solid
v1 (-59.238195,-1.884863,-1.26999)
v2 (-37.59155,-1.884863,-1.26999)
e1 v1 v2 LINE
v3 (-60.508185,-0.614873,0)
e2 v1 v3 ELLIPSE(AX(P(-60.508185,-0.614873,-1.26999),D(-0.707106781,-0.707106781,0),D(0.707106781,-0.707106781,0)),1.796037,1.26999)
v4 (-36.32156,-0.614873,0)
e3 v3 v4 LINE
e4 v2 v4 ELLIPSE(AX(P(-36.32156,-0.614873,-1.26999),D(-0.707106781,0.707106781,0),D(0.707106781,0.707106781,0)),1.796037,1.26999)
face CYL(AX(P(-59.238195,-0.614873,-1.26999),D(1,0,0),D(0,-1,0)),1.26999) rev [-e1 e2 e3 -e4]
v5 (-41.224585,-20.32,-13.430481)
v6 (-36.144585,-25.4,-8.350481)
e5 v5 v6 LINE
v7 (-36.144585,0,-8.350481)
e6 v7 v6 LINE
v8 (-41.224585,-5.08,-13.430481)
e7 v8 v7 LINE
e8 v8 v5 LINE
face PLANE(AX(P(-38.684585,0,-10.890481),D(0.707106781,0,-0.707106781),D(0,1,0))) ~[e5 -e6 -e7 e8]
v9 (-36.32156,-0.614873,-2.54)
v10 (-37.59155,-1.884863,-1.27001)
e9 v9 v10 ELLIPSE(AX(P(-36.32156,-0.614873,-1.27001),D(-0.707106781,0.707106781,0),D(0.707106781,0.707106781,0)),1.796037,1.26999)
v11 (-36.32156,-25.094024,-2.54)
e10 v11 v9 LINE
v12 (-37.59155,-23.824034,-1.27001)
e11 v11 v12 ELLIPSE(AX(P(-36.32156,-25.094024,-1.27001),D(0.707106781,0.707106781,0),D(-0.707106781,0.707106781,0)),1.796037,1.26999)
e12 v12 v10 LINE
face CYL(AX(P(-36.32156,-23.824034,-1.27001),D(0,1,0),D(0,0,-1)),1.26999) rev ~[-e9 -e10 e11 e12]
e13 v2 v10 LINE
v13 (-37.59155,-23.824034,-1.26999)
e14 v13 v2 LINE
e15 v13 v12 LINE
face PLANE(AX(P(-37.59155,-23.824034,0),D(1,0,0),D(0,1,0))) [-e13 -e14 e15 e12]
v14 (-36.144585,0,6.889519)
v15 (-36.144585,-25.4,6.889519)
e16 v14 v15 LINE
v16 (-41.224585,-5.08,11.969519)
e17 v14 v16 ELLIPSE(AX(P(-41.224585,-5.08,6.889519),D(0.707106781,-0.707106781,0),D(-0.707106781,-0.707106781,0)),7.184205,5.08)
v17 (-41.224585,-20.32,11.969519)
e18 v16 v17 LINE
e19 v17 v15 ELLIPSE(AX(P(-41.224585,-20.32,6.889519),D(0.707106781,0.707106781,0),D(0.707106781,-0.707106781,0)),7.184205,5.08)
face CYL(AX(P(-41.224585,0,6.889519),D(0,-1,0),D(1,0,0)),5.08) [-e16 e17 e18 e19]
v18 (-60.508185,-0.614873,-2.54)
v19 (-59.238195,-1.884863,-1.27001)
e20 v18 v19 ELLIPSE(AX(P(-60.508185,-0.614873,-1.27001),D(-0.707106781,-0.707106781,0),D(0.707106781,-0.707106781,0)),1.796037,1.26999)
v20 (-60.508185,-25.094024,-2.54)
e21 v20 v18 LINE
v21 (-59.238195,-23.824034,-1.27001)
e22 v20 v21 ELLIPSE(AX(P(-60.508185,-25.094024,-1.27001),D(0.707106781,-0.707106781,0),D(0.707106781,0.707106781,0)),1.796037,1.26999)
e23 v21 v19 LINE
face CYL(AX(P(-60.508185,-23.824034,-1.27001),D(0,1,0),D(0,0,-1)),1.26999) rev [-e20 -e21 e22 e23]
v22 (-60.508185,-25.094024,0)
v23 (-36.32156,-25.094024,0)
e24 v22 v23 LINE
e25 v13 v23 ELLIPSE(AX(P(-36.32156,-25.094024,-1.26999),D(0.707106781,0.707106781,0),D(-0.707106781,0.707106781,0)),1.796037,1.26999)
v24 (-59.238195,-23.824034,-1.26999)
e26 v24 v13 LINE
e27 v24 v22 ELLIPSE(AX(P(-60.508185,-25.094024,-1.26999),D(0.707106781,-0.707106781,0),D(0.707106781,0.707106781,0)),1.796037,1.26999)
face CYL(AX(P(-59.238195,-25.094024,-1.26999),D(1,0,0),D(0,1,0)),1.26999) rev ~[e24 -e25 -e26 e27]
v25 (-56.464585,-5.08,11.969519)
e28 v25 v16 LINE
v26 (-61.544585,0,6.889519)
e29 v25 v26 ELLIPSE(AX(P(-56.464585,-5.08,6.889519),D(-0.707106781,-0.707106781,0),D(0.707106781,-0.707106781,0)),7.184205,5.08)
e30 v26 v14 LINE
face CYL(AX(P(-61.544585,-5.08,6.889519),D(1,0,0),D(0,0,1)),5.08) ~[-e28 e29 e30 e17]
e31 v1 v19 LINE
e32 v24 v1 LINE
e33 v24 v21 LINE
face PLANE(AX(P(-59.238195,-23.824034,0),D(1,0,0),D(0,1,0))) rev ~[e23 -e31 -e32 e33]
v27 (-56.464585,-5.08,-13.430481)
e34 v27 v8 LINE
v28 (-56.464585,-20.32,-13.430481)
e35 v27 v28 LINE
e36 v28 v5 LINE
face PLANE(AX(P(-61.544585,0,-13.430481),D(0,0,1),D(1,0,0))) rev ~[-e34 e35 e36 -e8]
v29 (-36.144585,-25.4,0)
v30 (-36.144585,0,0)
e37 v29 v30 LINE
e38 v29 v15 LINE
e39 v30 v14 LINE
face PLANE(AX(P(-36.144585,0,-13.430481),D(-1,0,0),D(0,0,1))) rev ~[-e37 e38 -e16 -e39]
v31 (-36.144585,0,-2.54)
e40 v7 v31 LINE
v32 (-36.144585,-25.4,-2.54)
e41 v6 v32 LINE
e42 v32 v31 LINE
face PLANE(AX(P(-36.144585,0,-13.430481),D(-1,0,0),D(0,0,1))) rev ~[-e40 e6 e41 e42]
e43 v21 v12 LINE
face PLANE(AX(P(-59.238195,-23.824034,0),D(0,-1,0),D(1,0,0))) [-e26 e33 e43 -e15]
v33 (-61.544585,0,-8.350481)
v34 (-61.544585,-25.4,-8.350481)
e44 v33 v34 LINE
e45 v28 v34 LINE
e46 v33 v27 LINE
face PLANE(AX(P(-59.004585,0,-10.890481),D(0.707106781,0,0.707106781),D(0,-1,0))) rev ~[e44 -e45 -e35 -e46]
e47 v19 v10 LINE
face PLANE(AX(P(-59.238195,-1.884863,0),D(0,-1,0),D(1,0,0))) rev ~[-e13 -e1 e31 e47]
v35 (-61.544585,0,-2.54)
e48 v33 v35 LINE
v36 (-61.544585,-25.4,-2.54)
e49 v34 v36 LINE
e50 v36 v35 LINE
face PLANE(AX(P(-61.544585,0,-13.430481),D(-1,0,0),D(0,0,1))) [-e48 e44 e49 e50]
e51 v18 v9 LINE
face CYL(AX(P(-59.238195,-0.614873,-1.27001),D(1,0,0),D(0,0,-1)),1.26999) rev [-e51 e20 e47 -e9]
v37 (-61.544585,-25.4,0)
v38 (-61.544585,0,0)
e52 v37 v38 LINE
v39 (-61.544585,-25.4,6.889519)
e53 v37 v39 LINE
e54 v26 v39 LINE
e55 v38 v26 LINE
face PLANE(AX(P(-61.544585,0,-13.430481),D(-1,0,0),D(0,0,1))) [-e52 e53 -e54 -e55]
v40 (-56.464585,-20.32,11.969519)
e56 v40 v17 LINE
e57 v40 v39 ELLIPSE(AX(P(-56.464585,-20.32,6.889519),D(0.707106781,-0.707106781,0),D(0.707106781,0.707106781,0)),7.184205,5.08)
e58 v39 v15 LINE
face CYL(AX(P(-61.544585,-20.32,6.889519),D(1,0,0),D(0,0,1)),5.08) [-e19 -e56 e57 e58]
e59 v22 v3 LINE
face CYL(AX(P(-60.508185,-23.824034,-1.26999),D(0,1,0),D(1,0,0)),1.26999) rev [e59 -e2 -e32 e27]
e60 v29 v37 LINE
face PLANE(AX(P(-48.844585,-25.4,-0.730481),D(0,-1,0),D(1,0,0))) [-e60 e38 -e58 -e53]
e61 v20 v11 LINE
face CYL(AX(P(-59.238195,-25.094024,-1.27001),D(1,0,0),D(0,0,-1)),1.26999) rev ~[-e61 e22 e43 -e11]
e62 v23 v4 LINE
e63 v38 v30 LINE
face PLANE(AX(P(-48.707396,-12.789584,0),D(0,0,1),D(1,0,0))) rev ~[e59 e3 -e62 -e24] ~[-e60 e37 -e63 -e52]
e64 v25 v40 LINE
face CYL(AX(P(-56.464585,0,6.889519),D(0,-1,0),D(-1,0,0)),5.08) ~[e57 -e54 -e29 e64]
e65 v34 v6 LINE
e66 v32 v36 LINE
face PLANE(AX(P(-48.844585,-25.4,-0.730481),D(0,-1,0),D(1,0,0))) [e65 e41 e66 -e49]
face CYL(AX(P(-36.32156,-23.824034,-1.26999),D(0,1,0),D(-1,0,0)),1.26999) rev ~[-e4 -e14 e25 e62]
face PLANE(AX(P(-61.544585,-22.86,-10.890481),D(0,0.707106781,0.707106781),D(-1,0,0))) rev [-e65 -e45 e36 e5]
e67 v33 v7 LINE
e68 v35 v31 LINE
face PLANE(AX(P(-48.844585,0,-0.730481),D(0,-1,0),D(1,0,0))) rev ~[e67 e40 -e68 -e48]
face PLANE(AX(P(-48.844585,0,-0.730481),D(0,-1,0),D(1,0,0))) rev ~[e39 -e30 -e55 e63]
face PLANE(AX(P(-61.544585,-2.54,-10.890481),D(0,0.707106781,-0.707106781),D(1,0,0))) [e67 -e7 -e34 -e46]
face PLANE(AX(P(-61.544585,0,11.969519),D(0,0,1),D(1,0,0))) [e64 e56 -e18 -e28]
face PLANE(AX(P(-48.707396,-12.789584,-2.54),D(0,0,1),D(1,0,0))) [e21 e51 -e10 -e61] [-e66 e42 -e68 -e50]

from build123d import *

# Parameters (mm, degrees)
F0_W     = 25.4
F0_H     = 25.4
F1_DEPTH = 25.4
F2_R     = 5.08
F3_SIZE  = 5.08
F4_W     = 25.741957128
F4_H     = 25.5791675299
F4_W_2   = 21.6466449201
F4_H_2   = 21.9391710125
F5_DEPTH = 2.54
F6_R     = 1.26999


# Not quite as in the source:
# - a fillet or chamfer is up to 0.001 mm smaller than in the source, because OpenCascade refuses the exact size


with BuildPart() as f1:
    # F0 (on Front) → F1 (new body)
    with BuildSketch(Plane.XZ):
        with Locations((-48.8445848724, -0.7304809988)):
            Rectangle(F0_W, F0_H)
    extrude(amount=F1_DEPTH)

    # F2
    f2_edges = [f1.edges().sort_by_distance(p)[0] for p in [
        (-48.844585, -25.4, 11.969519),
        (-36.144585, -12.7, 11.969519),
        (-48.844585, 0, 11.969519),
        (-61.544585, -12.7, 11.969519),
    ]]
    fillet(f2_edges, radius=F2_R)

    # F3
    f3_edges = [f1.edges().sort_by_distance(p)[0] for p in [
        (-48.844585, -25.4, -13.430481),
        (-36.144585, -12.7, -13.430481),
        (-61.544585, -12.7, -13.430481),
        (-48.844585, 0, -13.430481),
    ]]
    chamfer(f3_edges, length=F3_SIZE)

    # F4 (on Top) → F5 (cut)
    with BuildSketch(Plane.XY):
        with Locations((-48.707395792, -12.789583765)):
            Rectangle(F4_W, F4_H)
        with Locations((-48.4148729593, -12.8544487525)):
            Rectangle(F4_W_2, F4_H_2, mode=Mode.SUBTRACT)
    extrude(amount=-F5_DEPTH, mode=Mode.SUBTRACT)

    # F6 (radius 1.27 in the source; OpenCascade refuses exactly that, so slightly less here)
    f6_edges = [f1.edges().sort_by_distance(p)[0] for p in [
        (-48.414873, -1.884863, -2.54),
        (-37.59155, -12.854449, -2.54),
        (-48.414873, -1.884863, 0),
        (-37.59155, -12.854449, 0),
        (-48.414873, -23.824034, -2.54),
        (-59.238195, -12.854449, -2.54),
        (-48.414873, -23.824034, 0),
        (-59.238195, -12.854449, 0),
    ]]
    fillet(f6_edges, radius=F6_R)


solid = f1.part
